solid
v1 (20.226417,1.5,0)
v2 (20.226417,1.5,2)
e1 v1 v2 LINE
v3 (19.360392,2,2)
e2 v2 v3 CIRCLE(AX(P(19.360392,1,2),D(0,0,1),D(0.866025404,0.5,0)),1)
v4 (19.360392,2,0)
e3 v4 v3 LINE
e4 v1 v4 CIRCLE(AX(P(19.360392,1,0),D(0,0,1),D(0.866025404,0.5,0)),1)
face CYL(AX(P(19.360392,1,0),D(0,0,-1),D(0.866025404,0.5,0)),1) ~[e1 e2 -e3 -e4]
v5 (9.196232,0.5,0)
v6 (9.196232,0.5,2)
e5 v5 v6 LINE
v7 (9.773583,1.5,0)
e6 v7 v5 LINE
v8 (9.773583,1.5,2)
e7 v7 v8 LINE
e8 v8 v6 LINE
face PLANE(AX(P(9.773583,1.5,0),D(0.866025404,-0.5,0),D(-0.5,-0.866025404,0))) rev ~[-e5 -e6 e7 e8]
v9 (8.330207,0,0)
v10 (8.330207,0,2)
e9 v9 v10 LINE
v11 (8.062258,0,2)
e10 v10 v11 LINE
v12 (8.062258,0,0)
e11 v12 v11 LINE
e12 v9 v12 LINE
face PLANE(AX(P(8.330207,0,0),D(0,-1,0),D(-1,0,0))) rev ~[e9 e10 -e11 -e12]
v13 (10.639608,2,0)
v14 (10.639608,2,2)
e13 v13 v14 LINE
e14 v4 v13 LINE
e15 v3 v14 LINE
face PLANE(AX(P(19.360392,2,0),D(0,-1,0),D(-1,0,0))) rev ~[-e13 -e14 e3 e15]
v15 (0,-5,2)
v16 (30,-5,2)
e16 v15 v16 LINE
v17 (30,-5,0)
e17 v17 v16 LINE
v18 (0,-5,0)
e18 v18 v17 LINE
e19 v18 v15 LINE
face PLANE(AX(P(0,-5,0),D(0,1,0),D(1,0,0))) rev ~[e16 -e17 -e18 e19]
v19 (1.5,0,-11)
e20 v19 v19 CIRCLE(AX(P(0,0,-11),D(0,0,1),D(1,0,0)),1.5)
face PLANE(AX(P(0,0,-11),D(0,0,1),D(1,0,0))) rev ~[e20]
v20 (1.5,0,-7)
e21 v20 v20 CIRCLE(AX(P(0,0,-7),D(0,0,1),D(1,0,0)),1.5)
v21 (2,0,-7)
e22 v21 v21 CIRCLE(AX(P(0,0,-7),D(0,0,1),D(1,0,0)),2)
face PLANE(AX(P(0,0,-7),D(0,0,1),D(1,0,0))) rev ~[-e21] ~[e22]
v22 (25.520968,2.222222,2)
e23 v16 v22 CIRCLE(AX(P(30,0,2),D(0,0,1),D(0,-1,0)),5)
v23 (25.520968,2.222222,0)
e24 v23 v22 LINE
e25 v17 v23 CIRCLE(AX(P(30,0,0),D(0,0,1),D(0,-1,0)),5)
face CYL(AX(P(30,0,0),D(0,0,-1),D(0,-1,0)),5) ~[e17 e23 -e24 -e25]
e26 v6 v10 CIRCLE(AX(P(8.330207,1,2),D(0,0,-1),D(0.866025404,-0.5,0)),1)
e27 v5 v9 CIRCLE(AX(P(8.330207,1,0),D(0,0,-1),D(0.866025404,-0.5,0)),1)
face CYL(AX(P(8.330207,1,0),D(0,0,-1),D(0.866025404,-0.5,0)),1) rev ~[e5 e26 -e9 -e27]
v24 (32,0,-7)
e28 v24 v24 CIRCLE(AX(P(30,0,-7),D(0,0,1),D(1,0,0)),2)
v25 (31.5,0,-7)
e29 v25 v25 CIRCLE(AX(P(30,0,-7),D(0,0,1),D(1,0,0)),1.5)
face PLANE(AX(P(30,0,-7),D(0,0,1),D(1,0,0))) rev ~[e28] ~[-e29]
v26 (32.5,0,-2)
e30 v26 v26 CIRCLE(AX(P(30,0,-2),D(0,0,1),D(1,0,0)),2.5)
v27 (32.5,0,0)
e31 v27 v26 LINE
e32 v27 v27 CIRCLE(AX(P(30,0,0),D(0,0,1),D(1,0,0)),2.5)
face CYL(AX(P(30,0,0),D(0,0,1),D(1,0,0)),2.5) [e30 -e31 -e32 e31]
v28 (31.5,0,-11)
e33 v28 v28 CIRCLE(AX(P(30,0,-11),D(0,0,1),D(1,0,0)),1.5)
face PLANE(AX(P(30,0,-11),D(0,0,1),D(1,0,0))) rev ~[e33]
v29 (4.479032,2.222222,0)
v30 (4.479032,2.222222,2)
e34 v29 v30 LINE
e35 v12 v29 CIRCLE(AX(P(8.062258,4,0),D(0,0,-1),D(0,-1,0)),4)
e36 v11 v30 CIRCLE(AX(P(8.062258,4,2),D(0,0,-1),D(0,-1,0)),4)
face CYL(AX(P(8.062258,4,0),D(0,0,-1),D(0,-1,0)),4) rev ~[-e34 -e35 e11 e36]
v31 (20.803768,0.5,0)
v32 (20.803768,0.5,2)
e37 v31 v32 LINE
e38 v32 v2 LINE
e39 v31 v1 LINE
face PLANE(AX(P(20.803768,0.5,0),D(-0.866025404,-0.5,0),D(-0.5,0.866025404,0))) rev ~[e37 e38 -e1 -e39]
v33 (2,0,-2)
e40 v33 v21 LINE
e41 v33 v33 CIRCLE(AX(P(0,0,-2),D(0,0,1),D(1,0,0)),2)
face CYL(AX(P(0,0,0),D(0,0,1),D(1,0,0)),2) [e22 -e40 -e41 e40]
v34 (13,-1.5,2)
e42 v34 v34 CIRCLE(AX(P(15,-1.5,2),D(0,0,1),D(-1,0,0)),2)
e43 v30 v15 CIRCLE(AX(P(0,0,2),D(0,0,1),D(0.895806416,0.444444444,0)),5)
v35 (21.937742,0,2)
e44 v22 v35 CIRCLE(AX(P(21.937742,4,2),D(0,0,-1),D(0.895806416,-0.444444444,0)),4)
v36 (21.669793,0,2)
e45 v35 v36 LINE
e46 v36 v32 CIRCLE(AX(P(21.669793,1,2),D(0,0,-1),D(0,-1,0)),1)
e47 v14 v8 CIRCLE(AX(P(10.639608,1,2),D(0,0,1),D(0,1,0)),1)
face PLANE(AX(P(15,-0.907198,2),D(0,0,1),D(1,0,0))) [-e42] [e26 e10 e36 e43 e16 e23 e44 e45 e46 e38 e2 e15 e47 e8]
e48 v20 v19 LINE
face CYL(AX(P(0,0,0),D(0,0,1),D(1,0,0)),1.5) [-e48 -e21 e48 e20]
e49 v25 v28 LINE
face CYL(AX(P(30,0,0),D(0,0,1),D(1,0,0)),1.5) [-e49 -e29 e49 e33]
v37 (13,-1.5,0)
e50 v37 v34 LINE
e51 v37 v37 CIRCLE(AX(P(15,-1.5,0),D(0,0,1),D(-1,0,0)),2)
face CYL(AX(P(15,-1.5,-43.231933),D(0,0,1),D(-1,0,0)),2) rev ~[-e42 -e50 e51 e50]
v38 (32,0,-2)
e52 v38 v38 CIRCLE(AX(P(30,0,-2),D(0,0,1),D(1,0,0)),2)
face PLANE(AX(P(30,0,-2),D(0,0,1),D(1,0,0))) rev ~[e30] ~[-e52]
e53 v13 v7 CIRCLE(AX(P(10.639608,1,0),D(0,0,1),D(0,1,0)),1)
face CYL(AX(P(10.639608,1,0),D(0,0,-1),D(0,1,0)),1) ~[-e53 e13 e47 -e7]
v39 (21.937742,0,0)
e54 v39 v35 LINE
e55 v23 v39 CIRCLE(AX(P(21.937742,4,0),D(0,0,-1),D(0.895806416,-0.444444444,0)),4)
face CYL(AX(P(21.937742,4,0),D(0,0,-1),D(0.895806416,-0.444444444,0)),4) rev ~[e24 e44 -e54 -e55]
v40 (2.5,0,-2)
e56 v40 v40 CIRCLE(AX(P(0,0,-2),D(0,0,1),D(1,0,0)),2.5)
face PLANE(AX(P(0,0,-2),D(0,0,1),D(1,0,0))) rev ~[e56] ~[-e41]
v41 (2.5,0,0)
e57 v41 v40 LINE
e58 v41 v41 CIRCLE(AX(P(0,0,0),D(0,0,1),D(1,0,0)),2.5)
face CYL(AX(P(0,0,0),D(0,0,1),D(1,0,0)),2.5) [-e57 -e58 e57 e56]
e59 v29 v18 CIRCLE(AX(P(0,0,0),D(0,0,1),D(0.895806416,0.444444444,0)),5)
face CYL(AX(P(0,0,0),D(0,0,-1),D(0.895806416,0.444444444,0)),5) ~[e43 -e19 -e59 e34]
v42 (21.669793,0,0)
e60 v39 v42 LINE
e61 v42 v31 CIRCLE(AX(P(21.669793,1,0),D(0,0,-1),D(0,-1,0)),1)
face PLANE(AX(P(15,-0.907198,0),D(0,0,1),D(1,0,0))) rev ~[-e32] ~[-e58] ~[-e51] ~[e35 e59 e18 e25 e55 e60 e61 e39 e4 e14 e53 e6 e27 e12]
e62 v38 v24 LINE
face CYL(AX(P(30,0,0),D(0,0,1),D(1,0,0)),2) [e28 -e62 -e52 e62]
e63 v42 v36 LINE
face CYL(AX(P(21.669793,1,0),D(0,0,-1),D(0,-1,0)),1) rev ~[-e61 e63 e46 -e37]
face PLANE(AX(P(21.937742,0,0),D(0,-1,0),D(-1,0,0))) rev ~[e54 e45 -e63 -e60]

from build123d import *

# Parameters (mm, degrees)
F1_DEPTH = 2
F2_R     = 2.5
F3_DEPTH = 2
F4_R     = 2
F5_DEPTH = 7
F6_R     = 1.5
F7_DEPTH = 11
F8_D     = 4


# Not quite as in the source:
# - a feature names something its author has since deleted; it is built from what else it names


with BuildPart() as f1:
    # F0 (on Top) → F1 (new body)
    with BuildSketch(Plane.XY):
        with BuildLine():
            ThreePointArc((4.4790320824, 2.2222222222), (-4.249182928, 2.6352313835), (0, -5))
            Line((0, -5), (30, -5))
            ThreePointArc((30, -5), (34.249182928, 2.6352313835), (25.5209679176, 2.2222222222))
            ThreePointArc((25.5209679176, 2.2222222222), (24.0459273585, 0.6006536576), (21.9377422517, 0))
            Line((21.9377422517, 0), (21.6697930593, 0))
            ThreePointArc((21.6697930593, 0), (21.1697930593, 0.1339745962), (20.8037676555, 0.5))
            Line((20.8037676555, 0.5), (20.2264173863, 1.5))
            ThreePointArc((20.2264173863, 1.5), (19.8603919825, 1.8660254038), (19.3603919825, 2))
            Line((19.3603919825, 2), (10.6396080175, 2))
            ThreePointArc((10.6396080175, 2), (10.1396080175, 1.8660254038), (9.7735826137, 1.5))
            Line((9.7735826137, 1.5), (9.1962323445, 0.5))
            ThreePointArc((9.1962323445, 0.5), (8.8302069407, 0.1339745962), (8.3302069407, 0))
            Line((8.3302069407, 0), (8.0622577483, 0))
            ThreePointArc((8.0622577483, 0), (5.9540726415, 0.6006536576), (4.4790320824, 2.2222222222))
        make_face()
    extrude(amount=F1_DEPTH)

    # F2 (on Top) → F3 (join)
    with BuildSketch(Plane.XY):
        Circle(F2_R)
        with Locations((30, 0)):
            Circle(F2_R)
    extrude(amount=-F3_DEPTH)

    # F4 (on Top) → F5 (join)
    with BuildSketch(Plane.XY):
        Circle(F4_R)
        with Locations((30, 0)):
            Circle(F4_R)
    extrude(amount=-F5_DEPTH)

    # F6 (on Top) → F7 (join)
    with BuildSketch(Plane.XY):
        Circle(F6_R)
        with Locations((30, 0)):
            Circle(F6_R)
    extrude(amount=-F7_DEPTH)

    # F8 (through all)
    with Locations(Plane(origin=(0, 0, 0), x_dir=(1, 0, 0), z_dir=(0, 0, -1))):
        with Locations((15, 1.5)):
            Hole(F8_D / 2)


solid = f1.part
